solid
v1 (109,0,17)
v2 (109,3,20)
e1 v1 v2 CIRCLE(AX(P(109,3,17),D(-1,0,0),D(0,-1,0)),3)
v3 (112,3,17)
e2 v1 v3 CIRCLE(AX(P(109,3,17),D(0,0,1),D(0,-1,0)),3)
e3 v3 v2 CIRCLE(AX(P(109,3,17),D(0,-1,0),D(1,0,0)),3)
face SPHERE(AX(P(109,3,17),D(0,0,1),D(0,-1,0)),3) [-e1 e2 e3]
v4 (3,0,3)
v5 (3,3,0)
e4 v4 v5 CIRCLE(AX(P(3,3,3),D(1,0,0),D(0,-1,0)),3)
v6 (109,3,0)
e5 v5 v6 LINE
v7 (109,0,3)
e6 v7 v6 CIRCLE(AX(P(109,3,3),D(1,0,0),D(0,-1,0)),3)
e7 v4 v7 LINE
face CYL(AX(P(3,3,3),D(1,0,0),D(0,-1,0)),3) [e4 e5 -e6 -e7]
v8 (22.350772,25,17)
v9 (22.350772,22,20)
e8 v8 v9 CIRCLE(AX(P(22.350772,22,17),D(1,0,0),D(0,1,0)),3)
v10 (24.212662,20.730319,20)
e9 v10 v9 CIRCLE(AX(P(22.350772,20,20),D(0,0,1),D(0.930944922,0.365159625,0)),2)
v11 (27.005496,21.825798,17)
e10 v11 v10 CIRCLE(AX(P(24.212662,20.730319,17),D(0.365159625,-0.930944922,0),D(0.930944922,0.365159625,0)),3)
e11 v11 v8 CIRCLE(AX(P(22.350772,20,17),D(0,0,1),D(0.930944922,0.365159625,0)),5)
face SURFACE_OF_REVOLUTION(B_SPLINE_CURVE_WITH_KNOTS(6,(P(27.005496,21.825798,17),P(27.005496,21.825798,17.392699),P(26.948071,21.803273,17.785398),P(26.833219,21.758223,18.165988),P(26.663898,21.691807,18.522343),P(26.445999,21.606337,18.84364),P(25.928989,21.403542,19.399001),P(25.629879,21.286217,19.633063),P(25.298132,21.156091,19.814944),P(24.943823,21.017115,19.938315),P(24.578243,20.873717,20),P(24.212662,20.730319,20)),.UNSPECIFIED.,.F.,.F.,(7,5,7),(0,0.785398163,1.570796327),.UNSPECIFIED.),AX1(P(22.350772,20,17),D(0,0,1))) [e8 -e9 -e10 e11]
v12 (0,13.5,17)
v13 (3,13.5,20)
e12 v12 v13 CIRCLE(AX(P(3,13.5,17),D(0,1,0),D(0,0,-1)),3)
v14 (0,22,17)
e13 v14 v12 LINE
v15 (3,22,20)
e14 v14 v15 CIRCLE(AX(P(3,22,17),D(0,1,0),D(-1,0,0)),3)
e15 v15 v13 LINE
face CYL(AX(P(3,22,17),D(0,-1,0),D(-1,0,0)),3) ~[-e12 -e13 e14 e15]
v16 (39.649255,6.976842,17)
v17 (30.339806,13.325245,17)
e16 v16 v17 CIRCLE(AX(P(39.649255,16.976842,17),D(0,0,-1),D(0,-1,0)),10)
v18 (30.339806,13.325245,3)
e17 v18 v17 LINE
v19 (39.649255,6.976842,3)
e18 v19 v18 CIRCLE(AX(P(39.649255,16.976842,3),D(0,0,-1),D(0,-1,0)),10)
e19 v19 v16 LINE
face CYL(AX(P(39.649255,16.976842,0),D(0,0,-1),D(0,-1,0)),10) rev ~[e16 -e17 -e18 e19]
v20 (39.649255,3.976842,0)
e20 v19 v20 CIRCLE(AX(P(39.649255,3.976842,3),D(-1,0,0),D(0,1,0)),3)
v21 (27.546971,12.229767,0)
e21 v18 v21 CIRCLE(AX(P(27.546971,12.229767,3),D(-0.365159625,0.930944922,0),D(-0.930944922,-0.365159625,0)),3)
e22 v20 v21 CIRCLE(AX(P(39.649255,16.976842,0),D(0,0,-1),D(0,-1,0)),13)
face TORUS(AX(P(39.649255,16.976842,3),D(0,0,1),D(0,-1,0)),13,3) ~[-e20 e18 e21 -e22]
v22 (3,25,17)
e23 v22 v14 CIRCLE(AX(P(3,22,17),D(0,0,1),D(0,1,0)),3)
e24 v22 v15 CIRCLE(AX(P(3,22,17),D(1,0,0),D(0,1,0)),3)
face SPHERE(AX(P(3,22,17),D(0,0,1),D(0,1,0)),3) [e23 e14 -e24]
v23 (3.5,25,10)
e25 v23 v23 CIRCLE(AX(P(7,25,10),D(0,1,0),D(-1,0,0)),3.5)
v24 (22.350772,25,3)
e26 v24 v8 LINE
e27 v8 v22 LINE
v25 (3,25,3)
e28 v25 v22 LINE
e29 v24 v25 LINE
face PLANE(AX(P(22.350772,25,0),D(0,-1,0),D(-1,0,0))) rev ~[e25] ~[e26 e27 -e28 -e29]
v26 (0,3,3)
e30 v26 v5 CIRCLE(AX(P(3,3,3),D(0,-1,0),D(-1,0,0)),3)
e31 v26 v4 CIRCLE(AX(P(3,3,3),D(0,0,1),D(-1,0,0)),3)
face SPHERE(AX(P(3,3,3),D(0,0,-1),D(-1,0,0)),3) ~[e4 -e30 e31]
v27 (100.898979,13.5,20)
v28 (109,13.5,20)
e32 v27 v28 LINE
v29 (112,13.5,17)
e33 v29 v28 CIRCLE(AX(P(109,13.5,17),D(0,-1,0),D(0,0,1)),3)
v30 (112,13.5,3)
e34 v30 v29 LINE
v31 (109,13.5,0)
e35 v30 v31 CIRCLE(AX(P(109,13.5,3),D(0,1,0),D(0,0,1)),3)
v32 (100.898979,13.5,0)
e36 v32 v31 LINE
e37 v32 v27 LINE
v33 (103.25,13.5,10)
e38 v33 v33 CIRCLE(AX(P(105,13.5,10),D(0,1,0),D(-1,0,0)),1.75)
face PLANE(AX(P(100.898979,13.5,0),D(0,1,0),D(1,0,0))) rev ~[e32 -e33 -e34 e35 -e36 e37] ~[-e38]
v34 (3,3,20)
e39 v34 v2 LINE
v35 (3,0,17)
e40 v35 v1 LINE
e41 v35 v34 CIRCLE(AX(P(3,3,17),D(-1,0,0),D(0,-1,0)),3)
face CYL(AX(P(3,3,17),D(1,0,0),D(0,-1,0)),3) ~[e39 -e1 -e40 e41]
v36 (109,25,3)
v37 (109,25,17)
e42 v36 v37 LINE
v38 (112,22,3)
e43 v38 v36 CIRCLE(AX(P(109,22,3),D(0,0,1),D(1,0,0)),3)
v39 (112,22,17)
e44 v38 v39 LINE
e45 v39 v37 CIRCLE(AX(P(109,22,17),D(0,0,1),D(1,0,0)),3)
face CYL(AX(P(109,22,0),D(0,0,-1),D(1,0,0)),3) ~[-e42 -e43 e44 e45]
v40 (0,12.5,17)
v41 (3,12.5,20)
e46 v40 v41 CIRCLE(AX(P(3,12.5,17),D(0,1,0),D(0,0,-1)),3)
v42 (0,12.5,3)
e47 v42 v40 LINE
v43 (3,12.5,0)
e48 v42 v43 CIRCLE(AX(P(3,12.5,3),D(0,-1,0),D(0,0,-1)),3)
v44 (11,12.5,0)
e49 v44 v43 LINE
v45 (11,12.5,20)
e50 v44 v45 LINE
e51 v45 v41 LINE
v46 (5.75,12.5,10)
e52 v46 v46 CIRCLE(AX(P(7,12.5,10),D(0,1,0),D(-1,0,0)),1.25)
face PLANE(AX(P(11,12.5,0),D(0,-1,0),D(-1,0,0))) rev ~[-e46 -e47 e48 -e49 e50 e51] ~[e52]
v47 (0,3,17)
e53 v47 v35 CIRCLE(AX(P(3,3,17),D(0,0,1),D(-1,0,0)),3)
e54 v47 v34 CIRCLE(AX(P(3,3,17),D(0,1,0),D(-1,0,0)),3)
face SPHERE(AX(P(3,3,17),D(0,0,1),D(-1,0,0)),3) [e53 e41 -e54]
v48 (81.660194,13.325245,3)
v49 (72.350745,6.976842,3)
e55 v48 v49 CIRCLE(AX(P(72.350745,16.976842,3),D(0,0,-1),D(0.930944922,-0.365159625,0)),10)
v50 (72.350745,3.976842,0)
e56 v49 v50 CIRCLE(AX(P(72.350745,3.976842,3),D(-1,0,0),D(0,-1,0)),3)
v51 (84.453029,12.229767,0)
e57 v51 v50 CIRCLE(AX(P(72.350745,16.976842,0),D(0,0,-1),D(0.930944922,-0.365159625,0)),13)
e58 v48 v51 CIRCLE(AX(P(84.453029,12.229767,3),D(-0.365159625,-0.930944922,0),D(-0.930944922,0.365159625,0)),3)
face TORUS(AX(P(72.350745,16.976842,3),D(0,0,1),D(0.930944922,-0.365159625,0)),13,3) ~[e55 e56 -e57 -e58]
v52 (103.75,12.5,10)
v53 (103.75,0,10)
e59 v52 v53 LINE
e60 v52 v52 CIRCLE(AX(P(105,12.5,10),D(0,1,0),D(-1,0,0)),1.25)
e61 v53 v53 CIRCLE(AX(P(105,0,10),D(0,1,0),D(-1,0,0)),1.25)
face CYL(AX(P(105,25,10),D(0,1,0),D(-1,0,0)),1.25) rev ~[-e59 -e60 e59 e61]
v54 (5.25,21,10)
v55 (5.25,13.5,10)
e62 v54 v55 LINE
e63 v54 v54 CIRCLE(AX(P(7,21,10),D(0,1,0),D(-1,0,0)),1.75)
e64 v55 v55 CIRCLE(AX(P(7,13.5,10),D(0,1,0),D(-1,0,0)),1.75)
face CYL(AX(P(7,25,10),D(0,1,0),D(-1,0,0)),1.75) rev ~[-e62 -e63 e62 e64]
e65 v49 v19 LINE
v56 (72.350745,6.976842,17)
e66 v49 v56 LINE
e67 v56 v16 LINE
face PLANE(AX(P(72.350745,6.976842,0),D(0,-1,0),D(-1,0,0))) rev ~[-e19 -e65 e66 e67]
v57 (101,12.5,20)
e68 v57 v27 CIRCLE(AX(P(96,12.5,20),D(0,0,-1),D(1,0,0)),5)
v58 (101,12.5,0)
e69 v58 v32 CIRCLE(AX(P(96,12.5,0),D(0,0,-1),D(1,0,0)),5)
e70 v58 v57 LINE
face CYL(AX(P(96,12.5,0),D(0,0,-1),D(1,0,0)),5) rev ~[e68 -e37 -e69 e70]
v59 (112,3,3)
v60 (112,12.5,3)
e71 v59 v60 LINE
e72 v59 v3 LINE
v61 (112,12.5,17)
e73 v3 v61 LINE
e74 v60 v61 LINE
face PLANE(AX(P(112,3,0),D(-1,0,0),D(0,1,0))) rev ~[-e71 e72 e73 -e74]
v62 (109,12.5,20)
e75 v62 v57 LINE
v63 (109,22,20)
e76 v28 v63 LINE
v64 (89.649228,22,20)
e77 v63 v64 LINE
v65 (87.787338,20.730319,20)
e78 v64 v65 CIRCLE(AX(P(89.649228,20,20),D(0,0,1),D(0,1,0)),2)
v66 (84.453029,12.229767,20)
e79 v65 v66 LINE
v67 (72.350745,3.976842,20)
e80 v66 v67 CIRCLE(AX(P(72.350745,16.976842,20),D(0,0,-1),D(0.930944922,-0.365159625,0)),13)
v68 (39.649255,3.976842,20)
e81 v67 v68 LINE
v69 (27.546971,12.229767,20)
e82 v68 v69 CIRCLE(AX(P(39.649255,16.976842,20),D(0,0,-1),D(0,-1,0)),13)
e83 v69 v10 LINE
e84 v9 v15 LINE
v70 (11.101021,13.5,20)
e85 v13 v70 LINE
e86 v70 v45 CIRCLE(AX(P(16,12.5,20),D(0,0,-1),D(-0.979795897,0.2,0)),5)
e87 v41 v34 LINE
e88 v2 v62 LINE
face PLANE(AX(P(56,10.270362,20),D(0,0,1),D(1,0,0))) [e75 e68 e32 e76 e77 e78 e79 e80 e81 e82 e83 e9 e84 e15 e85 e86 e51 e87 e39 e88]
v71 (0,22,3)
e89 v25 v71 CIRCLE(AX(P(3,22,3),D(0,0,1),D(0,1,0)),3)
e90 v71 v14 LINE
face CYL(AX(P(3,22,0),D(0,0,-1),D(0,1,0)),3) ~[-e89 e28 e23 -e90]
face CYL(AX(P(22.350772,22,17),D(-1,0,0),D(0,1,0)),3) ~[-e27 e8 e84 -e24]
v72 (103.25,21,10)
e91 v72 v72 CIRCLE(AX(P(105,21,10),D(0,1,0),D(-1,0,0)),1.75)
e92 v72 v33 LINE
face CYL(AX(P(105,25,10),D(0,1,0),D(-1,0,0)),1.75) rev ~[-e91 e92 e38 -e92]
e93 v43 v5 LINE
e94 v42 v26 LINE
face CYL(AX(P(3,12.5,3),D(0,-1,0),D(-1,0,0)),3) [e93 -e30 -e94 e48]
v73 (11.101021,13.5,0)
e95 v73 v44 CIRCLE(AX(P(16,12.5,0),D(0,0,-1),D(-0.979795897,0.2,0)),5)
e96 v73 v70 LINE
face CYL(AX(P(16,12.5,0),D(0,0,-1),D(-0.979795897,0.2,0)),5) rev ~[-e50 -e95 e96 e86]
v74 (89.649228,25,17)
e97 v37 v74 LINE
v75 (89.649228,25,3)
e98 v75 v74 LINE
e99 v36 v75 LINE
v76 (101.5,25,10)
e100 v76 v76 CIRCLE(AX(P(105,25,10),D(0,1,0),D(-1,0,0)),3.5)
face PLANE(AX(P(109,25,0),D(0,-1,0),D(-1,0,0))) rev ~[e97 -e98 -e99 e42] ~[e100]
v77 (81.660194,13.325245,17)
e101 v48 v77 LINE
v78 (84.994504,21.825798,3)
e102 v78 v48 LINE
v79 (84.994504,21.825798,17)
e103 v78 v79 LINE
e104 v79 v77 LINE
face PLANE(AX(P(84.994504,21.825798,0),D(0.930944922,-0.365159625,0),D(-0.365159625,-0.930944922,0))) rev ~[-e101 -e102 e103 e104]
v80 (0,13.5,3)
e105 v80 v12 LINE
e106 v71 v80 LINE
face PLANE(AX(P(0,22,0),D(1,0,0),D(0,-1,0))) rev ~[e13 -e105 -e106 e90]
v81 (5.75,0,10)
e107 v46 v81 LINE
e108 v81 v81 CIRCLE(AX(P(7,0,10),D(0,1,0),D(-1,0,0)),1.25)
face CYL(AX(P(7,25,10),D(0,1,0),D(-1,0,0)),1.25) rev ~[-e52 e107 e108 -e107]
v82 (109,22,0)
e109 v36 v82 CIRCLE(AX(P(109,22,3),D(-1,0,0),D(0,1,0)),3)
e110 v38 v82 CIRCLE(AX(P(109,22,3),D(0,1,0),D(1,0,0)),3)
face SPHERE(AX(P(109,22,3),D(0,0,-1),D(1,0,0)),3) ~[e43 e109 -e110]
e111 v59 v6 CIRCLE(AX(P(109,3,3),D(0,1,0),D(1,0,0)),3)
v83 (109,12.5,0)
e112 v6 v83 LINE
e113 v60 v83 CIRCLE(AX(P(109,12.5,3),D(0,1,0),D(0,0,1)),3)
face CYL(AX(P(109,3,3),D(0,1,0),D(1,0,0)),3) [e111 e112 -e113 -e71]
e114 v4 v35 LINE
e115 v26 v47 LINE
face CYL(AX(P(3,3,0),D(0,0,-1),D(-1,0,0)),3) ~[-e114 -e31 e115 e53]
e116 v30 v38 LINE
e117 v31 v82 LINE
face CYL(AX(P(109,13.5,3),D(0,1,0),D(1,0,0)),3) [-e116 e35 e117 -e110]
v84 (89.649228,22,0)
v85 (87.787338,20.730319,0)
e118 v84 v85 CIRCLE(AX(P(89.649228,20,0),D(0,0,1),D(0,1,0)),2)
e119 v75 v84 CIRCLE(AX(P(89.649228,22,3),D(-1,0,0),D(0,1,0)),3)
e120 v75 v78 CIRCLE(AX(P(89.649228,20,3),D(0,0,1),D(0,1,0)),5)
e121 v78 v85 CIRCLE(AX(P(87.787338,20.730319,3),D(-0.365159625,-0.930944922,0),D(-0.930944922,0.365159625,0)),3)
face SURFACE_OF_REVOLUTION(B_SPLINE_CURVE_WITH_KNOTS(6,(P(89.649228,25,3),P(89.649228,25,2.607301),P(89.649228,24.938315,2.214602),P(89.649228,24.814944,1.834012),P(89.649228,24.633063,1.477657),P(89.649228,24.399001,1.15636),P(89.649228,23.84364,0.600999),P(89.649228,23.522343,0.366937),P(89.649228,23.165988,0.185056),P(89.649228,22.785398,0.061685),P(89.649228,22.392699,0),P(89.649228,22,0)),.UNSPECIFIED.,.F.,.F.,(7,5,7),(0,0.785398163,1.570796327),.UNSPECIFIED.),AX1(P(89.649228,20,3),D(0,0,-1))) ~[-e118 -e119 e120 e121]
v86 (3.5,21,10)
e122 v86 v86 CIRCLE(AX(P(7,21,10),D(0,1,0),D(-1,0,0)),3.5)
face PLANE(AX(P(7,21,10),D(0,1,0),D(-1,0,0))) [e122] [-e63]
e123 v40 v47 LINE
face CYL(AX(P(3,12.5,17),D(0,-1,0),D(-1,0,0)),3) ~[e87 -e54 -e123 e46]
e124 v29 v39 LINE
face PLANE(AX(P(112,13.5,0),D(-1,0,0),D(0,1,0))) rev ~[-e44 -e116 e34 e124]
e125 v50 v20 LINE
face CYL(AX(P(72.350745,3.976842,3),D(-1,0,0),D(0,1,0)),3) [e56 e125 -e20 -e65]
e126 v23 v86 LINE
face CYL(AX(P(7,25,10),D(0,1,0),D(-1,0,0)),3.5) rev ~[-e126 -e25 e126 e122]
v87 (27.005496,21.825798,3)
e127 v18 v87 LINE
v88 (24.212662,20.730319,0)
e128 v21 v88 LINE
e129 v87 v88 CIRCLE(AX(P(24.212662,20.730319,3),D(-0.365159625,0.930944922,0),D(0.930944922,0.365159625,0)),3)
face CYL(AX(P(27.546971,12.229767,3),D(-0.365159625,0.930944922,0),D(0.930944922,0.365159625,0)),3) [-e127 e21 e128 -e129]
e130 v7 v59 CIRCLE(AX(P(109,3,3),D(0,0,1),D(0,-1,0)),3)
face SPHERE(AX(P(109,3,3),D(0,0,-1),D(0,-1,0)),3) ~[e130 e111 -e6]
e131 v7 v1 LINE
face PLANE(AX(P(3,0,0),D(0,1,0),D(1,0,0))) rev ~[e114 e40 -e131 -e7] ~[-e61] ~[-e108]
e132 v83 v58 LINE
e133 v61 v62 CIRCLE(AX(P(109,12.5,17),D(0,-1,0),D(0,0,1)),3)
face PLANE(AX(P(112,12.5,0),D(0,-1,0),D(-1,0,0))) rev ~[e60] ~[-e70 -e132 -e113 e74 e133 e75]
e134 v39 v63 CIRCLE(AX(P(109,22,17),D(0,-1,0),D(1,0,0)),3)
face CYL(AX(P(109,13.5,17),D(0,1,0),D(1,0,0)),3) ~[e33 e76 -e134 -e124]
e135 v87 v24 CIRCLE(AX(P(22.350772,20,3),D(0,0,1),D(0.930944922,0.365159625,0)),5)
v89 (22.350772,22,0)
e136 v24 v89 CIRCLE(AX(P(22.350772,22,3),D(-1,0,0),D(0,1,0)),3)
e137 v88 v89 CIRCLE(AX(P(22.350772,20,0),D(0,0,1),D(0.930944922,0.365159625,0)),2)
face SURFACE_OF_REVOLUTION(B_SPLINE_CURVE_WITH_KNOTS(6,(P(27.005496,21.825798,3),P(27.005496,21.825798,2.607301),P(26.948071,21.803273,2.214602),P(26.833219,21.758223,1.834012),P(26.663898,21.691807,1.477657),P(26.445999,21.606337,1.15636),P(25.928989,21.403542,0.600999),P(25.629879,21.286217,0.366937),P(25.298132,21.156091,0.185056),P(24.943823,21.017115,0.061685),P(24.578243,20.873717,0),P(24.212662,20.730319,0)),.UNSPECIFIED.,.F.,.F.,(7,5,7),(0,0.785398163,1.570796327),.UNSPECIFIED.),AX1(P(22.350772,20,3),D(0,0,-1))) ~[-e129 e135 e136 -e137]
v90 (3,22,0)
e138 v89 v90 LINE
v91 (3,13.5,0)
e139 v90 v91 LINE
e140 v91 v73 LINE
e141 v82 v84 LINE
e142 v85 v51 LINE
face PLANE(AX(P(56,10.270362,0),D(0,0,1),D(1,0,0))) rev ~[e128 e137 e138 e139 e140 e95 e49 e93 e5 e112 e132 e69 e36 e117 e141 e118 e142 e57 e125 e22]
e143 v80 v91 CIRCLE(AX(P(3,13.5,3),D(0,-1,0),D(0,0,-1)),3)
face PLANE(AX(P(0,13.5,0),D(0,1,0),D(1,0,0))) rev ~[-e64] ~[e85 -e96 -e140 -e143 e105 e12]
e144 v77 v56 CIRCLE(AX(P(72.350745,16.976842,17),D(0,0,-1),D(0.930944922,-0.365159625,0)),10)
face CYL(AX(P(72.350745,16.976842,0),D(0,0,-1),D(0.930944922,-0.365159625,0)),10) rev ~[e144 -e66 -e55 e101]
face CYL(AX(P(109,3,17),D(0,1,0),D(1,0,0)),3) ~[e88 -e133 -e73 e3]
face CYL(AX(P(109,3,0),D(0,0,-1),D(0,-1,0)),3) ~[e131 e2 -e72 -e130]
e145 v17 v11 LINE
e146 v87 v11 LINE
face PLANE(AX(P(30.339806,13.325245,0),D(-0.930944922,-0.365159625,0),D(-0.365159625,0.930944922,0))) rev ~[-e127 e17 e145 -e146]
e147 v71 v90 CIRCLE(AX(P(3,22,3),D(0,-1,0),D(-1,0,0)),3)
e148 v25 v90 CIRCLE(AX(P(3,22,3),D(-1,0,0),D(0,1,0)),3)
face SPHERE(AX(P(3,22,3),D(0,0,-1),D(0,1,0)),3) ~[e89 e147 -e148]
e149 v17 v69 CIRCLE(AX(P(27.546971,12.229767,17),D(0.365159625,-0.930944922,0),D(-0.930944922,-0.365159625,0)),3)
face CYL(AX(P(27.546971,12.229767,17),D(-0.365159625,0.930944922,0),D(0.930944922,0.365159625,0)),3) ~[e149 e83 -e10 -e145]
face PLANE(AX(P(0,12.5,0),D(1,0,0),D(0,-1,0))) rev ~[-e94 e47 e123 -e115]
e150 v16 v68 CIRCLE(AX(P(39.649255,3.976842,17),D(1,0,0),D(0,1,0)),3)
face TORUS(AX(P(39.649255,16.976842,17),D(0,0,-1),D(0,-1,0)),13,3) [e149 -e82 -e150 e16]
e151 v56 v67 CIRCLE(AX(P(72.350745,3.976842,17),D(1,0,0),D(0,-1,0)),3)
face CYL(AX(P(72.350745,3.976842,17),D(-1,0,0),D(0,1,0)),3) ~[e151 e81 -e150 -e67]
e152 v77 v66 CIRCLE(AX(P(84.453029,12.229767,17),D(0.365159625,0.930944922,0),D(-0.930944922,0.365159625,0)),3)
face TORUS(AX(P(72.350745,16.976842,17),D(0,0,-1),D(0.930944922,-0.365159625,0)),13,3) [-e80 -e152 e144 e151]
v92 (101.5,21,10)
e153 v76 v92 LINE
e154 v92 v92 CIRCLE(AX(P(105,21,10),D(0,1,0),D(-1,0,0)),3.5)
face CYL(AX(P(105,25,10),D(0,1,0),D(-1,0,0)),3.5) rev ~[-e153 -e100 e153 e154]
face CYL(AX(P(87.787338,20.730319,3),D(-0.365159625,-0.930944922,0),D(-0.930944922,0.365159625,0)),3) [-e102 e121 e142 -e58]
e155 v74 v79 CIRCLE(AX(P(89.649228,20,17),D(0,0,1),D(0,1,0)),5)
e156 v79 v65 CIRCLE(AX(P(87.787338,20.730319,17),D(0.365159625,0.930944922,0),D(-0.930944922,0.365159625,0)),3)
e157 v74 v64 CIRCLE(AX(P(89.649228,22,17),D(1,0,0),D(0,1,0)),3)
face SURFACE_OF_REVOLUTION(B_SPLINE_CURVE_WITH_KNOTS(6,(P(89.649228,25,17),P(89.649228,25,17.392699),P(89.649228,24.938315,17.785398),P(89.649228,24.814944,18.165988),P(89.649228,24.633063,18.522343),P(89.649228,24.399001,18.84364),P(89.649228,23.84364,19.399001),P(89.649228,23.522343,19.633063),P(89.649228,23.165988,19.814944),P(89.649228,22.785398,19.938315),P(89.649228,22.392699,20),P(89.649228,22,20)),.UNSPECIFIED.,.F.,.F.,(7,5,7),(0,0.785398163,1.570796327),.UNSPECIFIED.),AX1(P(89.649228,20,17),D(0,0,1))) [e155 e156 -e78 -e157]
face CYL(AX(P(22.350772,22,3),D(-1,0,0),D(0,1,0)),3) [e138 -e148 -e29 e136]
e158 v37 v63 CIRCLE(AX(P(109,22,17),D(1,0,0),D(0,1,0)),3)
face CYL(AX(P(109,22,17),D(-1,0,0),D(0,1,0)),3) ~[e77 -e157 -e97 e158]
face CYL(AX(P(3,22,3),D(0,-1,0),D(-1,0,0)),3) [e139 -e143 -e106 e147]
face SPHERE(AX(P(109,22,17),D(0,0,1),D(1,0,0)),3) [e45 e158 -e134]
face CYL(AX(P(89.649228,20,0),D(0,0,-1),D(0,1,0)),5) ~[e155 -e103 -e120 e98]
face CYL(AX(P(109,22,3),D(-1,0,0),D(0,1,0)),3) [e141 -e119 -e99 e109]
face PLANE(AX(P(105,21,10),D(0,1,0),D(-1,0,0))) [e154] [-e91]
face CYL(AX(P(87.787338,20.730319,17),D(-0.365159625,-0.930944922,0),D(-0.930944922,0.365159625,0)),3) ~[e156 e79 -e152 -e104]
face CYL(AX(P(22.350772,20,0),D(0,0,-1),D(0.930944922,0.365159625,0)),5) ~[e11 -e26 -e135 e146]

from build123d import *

# Parameters (mm, degrees)
F1_DEPTH  = 20
F2_R      = 3
F3_R      = 1.25
F4_DEPTH  = 30
F3_R_2    = 1.75
F5_DEPTH  = 12
F3_R_3    = 3.5
F6_DEPTH  = 4
F7_R      = 1.25
F8_DEPTH  = 30
F7_R_2    = 1.75
F9_DEPTH  = 12
F7_R_3    = 3.5
F10_DEPTH = 4


# Not quite as in the source:
# - a feature names something its author has since deleted; it is built from what else it names


with BuildPart() as f1:
    # F0 (on Top) → F1 (new body)
    with BuildSketch(Plane.XY):
        with BuildLine():
            Line((3, 0), (56, 0))
            Line((56, 0), (109, 0))
            ThreePointArc((109, 0), (111.1213203436, 0.8786796564), (112, 3))
            Line((112, 3), (112, 12.5))
            Line((112, 12.5), (101, 12.5))
            ThreePointArc((101, 12.5), (91.025319235, 11.99745519), (100.8989794856, 13.5))
            Line((100.8989794856, 13.5), (112, 13.5))
            Line((112, 13.5), (112, 22))
            ThreePointArc((112, 22), (111.1213203436, 24.1213203436), (109, 25))
            Line((109, 25), (95.7940161003, 25))
            Line((95.7940161003, 25), (92, 25))
            Line((92, 25), (89.649228215, 25))
            ThreePointArc((89.649228215, 25), (86.8322254301, 24.1309194267), (84.9945036033, 21.825798124))
            Line((84.9945036033, 21.825798124), (81.660193975, 13.3252454689))
            ThreePointArc((81.660193975, 13.3252454689), (77.9847503214, 8.7150028635), (72.3507447516, 6.9768417168))
            Line((72.3507447516, 6.9768417168), (61.9619729666, 6.9768417168))
            Line((61.9619729666, 6.9768417168), (56, 6.9768417168))
            Line((56, 6.9768417168), (50.0380270334, 6.9768417168))
            Line((50.0380270334, 6.9768417168), (39.6492552484, 6.9768417168))
            ThreePointArc((39.6492552484, 6.9768417168), (34.0152496786, 8.7150028635), (30.339806025, 13.3252454689))
            Line((30.339806025, 13.3252454689), (27.0054963967, 21.825798124))
            ThreePointArc((27.0054963967, 21.825798124), (25.1677745699, 24.1309194267), (22.350771785, 25))
            Line((22.350771785, 25), (20, 25))
            Line((20, 25), (16.2059838997, 25))
            Line((16.2059838997, 25), (3, 25))
            ThreePointArc((3, 25), (0.8786796564, 24.1213203436), (0, 22))
            Line((0, 22), (0, 13.5))
            Line((0, 13.5), (11.1010205144, 13.5))
            ThreePointArc((11.1010205144, 13.5), (20.974680765, 11.99745519), (11, 12.5))
            Line((11, 12.5), (0, 12.5))
            Line((0, 12.5), (0, 3))
            ThreePointArc((0, 3), (0.8786796564, 0.8786796564), (3, 0))
        make_face()
    extrude(amount=F1_DEPTH)

    # F2
    f2_edges = [f1.edges().sort_by_distance(p)[0] for p in [
        (56, 0, 20),
        (99.324614, 25, 20),
        (56, 0, 0),
        (99.324614, 25, 0),
    ]]
    fillet(f2_edges, radius=F2_R)

    # F3 (on face) → F4 (cut)
    with BuildSketch(Plane(origin=(0, 25, 0), x_dir=(-1, 0, 0), z_dir=(0, 1, 0))):
        with Locations((-7, 10)):
            Circle(F3_R)
    extrude(amount=-F4_DEPTH, mode=Mode.SUBTRACT)

    # F3 (on face) → F5 (cut)
    with BuildSketch(Plane(origin=(0, 25, 0), x_dir=(-1, 0, 0), z_dir=(0, 1, 0))):
        with Locations((-7, 10)):
            Circle(F3_R_2)
        with Locations((-7, 10)):
            Circle(F3_R, mode=Mode.SUBTRACT)
    extrude(amount=-F5_DEPTH, mode=Mode.SUBTRACT)

    # F3 (on face) → F6 (cut)
    with BuildSketch(Plane(origin=(0, 25, 0), x_dir=(-1, 0, 0), z_dir=(0, 1, 0))):
        with Locations((-7, 10)):
            Circle(F3_R_3)
        with Locations((-7, 10)):
            Circle(F3_R_2, mode=Mode.SUBTRACT)
        with Locations((-7, 10)):
            Circle(F3_R_2)
        with Locations((-7, 10)):
            Circle(F3_R, mode=Mode.SUBTRACT)
        with Locations((-7, 10)):
            Circle(F3_R)
    extrude(amount=-F6_DEPTH, mode=Mode.SUBTRACT)

    # F7 (on face) → F8 (cut)
    with BuildSketch(Plane(origin=(0, 25, 0), x_dir=(-1, 0, 0), z_dir=(0, 1, 0))):
        with Locations((-105, 10)):
            Circle(F7_R)
    extrude(amount=-F8_DEPTH, mode=Mode.SUBTRACT)

    # F7 (on face) → F9 (cut)
    with BuildSketch(Plane(origin=(0, 25, 0), x_dir=(-1, 0, 0), z_dir=(0, 1, 0))):
        with Locations((-105, 10)):
            Circle(F7_R_2)
        with Locations((-105, 10)):
            Circle(F7_R, mode=Mode.SUBTRACT)
    extrude(amount=-F9_DEPTH, mode=Mode.SUBTRACT)

    # F7 (on face) → F10 (cut)
    with BuildSketch(Plane(origin=(0, 25, 0), x_dir=(-1, 0, 0), z_dir=(0, 1, 0))):
        with Locations((-105, 10)):
            Circle(F7_R_3)
        with Locations((-105, 10)):
            Circle(F7_R_2, mode=Mode.SUBTRACT)
    extrude(amount=-F10_DEPTH, mode=Mode.SUBTRACT)


solid = f1.part
